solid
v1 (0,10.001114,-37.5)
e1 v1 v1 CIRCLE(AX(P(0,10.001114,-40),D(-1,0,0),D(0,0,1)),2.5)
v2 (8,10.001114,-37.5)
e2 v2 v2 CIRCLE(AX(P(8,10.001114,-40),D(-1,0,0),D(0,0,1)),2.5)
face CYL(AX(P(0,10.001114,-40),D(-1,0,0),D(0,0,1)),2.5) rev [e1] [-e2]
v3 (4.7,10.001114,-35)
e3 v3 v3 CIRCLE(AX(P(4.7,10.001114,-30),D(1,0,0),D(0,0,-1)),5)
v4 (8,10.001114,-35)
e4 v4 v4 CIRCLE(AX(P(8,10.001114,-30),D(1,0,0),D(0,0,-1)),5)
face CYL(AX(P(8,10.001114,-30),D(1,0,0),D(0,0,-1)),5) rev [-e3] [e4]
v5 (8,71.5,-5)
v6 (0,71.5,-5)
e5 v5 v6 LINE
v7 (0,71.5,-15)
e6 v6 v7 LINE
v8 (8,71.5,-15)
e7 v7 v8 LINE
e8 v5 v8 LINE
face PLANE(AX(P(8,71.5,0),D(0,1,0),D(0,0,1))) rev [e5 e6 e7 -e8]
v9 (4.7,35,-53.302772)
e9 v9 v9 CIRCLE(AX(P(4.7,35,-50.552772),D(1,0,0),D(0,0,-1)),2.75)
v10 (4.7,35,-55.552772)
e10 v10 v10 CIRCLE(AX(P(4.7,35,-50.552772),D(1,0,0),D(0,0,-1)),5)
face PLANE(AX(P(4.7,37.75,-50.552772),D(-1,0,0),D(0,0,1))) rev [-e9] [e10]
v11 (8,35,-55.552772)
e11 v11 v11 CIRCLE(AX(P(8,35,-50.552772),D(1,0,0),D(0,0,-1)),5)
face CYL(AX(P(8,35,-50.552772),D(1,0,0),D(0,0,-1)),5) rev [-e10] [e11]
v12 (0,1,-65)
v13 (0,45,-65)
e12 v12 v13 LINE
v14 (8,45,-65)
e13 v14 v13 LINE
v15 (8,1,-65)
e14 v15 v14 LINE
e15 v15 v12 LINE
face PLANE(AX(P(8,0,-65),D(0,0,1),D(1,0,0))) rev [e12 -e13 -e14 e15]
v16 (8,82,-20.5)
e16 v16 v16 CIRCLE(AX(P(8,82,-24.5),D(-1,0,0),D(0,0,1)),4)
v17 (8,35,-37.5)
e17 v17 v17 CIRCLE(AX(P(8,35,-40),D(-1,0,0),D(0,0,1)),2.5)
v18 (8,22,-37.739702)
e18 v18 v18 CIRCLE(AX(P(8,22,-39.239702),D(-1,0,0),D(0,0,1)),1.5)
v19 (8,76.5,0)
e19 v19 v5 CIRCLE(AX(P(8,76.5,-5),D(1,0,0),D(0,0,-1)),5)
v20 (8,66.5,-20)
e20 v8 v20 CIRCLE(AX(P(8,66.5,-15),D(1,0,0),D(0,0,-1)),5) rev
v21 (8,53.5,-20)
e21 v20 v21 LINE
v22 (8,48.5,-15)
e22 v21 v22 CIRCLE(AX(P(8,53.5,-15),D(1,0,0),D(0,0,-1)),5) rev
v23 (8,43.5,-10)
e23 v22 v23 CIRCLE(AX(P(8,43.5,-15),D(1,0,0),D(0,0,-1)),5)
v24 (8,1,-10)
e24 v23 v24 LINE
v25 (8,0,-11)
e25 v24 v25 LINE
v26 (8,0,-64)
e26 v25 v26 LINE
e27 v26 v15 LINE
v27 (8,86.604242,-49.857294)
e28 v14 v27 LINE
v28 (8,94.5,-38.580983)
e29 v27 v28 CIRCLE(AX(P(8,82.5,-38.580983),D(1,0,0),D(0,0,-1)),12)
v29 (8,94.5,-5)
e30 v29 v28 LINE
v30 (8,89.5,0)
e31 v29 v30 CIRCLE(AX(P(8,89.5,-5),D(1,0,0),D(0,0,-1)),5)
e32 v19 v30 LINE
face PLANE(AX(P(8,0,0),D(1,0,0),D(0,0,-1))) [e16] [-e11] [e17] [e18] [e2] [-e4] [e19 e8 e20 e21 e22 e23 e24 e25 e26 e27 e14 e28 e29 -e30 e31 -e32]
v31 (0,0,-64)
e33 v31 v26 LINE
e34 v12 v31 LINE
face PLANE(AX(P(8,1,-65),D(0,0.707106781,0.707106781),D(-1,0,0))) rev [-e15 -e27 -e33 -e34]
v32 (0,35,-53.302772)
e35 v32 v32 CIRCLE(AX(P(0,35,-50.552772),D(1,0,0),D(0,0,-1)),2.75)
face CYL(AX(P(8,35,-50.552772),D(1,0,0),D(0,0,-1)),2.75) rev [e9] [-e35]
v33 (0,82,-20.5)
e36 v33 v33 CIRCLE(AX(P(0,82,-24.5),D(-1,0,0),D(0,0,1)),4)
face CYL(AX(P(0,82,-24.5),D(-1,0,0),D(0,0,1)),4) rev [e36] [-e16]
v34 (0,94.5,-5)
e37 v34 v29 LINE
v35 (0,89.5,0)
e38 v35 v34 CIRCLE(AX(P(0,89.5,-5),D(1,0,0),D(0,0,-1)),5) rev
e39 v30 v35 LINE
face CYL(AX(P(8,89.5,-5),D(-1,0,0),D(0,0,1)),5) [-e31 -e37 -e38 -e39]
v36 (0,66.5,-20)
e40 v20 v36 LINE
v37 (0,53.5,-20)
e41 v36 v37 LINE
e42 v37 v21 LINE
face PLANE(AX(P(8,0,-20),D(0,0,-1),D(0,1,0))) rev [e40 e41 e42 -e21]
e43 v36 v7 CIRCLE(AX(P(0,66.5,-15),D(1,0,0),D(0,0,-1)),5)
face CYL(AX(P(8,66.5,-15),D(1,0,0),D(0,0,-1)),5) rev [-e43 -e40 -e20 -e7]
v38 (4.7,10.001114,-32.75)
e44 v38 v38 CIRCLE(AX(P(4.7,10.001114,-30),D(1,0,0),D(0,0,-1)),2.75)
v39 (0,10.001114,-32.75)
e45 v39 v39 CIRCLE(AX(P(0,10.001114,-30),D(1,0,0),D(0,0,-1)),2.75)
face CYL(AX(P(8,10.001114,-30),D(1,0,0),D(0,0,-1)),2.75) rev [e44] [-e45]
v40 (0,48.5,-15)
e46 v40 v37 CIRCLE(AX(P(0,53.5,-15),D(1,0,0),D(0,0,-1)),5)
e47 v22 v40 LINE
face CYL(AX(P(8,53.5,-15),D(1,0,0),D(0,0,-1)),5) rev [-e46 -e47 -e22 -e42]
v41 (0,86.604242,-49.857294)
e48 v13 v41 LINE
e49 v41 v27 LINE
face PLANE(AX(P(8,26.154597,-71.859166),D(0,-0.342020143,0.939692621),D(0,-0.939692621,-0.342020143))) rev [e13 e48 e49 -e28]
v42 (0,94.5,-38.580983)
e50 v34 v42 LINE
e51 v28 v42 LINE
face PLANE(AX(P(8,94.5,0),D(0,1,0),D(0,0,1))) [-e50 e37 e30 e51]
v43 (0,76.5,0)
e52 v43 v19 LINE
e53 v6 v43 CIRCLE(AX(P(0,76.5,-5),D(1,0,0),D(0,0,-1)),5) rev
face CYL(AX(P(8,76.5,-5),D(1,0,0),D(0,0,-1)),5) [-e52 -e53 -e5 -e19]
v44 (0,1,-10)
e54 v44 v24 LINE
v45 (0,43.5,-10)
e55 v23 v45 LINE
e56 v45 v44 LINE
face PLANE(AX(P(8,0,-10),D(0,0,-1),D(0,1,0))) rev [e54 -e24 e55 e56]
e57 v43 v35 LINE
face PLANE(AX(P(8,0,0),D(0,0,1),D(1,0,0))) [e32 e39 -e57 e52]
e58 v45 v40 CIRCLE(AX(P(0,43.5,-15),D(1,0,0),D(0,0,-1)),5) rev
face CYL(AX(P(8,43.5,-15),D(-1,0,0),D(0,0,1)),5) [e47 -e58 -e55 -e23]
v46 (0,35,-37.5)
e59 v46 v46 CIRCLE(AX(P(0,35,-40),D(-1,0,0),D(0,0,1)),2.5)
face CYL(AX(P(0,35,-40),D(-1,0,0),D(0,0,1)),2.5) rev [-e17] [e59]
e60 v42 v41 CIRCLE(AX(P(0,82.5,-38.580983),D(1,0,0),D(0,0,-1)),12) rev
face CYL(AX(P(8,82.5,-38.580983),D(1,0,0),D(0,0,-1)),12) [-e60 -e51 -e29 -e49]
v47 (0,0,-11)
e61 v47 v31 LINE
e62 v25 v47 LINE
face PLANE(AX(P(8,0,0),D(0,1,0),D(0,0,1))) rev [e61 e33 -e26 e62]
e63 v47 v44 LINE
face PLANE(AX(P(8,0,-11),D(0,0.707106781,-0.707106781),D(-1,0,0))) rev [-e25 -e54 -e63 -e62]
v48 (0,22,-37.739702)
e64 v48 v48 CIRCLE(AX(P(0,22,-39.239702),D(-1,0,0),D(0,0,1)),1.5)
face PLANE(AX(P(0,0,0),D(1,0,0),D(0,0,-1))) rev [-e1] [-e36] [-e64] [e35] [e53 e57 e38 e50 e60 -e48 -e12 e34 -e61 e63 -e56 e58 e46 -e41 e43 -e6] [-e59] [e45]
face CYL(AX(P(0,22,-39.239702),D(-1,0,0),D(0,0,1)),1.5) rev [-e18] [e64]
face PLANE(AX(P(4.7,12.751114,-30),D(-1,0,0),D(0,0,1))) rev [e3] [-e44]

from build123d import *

# Parameters (mm, degrees)
BOSS_EXTRUDE1_DEPTH                         = 8
FILLET1_R                                   = 12
FILLET2_R                                   = 5
FILLET3_R                                   = 5
CHAMFER2_SIZE                               = 1
F_5_0MM_DOWEL_HOLE3_D                       = 5
F_3_0MM_DOWEL_HOLE1_D                       = 3
CBORE_FOR_M5_CHEESE_HEAD_SCREW5_D           = 5.5
CBORE_FOR_M5_CHEESE_HEAD_SCREW5_CBORE_D     = 10
CBORE_FOR_M5_CHEESE_HEAD_SCREW5_CBORE_DEPTH = 3.3
CBORE_FOR_M5_CHEESE_HEAD_SCREW6_D           = 5.5
CBORE_FOR_M5_CHEESE_HEAD_SCREW6_CBORE_D     = 10
CBORE_FOR_M5_CHEESE_HEAD_SCREW6_CBORE_DEPTH = 3.3
F_8_0MM_DOWEL_HOLE3_D                       = 8


with BuildPart() as part:
    # Sketch1 → Boss-Extrude1 (new body)
    with BuildSketch(Plane(origin=(0, 0, 0), x_dir=(0, 0, -1), z_dir=(1, 0, 0))):
        Polygon((65, 0), (65, 45), (46.983473404, 94.5), (0, 94.5), (0, 71.5), (20, 71.5), (20, 48.5), (10, 48.5), (10, 0), align=None)
    extrude(amount=BOSS_EXTRUDE1_DEPTH)

    # Fillet1
    fillet1_edges = [part.edges().sort_by_distance(p)[0] for p in [
        (4, 94.5, -46.983473404),
    ]]
    fillet(fillet1_edges, radius=FILLET1_R)

    # Fillet2
    fillet2_edges = [part.edges().sort_by_distance(p)[0] for p in [
        (4, 94.5, 0),
    ]]
    fillet(fillet2_edges, radius=FILLET2_R)

    # Fillet3
    fillet3_edges = [part.edges().sort_by_distance(p)[0] for p in [
        (4, 48.5, -20),
        (4, 71.5, -20),
    ]]
    fillet(fillet3_edges, radius=FILLET3_R)
    fillet3_2_edges = [part.edges().sort_by_distance(p)[0] for p in [
        (4, 48.5, -10),
        (4, 71.5, 0),
    ]]
    fillet(fillet3_2_edges, radius=FILLET3_R - 0.0001)  # a hair under: the kernel refuses the full size

    # Chamfer2
    chamfer2_edges = [part.edges().sort_by_distance(p)[0] for p in [
        (4, 0, -65),
        (4, 0, -10),
    ]]
    chamfer(chamfer2_edges, length=CHAMFER2_SIZE)

    # Ø5.0mm Dowel Hole3 (through all)
    with Locations(Plane(origin=(0, 0, 0), x_dir=(0, 0, -1), z_dir=(-1, 0, 0))):
        with Locations((40, -35), (40, -10.001113523)):
            Hole(F_5_0MM_DOWEL_HOLE3_D / 2)

    # Ø3.0mm Dowel Hole1 (through all)
    with Locations(Plane(origin=(0, 0, 0), x_dir=(0, 0, -1), z_dir=(-1, 0, 0))):
        with Locations((39.239701592, -22)):
            Hole(F_3_0MM_DOWEL_HOLE1_D / 2)

    # CBORE for M5 Cheese Head Screw5 (through all)
    with Locations(Plane(origin=(8, 0, 0), x_dir=(0, 0, -1), z_dir=(1, 0, 0))):
        with Locations((30, 10.001113523)):
            CounterBoreHole(CBORE_FOR_M5_CHEESE_HEAD_SCREW5_D / 2, CBORE_FOR_M5_CHEESE_HEAD_SCREW5_CBORE_D / 2, CBORE_FOR_M5_CHEESE_HEAD_SCREW5_CBORE_DEPTH)

    # CBORE for M5 Cheese Head Screw6 (through all)
    with Locations(Plane(origin=(8, 0, 0), x_dir=(0, 0, -1), z_dir=(1, 0, 0))):
        with Locations((50.552772121, 35)):
            CounterBoreHole(CBORE_FOR_M5_CHEESE_HEAD_SCREW6_D / 2, CBORE_FOR_M5_CHEESE_HEAD_SCREW6_CBORE_D / 2, CBORE_FOR_M5_CHEESE_HEAD_SCREW6_CBORE_DEPTH)

    # Ø8.0mm Dowel Hole3 (through all)
    with Locations(Plane(origin=(0, 0, 0), x_dir=(0, 0, -1), z_dir=(-1, 0, 0))):
        with Locations((24.5, -82)):
            Hole(F_8_0MM_DOWEL_HOLE3_D / 2)


solid = part.part
